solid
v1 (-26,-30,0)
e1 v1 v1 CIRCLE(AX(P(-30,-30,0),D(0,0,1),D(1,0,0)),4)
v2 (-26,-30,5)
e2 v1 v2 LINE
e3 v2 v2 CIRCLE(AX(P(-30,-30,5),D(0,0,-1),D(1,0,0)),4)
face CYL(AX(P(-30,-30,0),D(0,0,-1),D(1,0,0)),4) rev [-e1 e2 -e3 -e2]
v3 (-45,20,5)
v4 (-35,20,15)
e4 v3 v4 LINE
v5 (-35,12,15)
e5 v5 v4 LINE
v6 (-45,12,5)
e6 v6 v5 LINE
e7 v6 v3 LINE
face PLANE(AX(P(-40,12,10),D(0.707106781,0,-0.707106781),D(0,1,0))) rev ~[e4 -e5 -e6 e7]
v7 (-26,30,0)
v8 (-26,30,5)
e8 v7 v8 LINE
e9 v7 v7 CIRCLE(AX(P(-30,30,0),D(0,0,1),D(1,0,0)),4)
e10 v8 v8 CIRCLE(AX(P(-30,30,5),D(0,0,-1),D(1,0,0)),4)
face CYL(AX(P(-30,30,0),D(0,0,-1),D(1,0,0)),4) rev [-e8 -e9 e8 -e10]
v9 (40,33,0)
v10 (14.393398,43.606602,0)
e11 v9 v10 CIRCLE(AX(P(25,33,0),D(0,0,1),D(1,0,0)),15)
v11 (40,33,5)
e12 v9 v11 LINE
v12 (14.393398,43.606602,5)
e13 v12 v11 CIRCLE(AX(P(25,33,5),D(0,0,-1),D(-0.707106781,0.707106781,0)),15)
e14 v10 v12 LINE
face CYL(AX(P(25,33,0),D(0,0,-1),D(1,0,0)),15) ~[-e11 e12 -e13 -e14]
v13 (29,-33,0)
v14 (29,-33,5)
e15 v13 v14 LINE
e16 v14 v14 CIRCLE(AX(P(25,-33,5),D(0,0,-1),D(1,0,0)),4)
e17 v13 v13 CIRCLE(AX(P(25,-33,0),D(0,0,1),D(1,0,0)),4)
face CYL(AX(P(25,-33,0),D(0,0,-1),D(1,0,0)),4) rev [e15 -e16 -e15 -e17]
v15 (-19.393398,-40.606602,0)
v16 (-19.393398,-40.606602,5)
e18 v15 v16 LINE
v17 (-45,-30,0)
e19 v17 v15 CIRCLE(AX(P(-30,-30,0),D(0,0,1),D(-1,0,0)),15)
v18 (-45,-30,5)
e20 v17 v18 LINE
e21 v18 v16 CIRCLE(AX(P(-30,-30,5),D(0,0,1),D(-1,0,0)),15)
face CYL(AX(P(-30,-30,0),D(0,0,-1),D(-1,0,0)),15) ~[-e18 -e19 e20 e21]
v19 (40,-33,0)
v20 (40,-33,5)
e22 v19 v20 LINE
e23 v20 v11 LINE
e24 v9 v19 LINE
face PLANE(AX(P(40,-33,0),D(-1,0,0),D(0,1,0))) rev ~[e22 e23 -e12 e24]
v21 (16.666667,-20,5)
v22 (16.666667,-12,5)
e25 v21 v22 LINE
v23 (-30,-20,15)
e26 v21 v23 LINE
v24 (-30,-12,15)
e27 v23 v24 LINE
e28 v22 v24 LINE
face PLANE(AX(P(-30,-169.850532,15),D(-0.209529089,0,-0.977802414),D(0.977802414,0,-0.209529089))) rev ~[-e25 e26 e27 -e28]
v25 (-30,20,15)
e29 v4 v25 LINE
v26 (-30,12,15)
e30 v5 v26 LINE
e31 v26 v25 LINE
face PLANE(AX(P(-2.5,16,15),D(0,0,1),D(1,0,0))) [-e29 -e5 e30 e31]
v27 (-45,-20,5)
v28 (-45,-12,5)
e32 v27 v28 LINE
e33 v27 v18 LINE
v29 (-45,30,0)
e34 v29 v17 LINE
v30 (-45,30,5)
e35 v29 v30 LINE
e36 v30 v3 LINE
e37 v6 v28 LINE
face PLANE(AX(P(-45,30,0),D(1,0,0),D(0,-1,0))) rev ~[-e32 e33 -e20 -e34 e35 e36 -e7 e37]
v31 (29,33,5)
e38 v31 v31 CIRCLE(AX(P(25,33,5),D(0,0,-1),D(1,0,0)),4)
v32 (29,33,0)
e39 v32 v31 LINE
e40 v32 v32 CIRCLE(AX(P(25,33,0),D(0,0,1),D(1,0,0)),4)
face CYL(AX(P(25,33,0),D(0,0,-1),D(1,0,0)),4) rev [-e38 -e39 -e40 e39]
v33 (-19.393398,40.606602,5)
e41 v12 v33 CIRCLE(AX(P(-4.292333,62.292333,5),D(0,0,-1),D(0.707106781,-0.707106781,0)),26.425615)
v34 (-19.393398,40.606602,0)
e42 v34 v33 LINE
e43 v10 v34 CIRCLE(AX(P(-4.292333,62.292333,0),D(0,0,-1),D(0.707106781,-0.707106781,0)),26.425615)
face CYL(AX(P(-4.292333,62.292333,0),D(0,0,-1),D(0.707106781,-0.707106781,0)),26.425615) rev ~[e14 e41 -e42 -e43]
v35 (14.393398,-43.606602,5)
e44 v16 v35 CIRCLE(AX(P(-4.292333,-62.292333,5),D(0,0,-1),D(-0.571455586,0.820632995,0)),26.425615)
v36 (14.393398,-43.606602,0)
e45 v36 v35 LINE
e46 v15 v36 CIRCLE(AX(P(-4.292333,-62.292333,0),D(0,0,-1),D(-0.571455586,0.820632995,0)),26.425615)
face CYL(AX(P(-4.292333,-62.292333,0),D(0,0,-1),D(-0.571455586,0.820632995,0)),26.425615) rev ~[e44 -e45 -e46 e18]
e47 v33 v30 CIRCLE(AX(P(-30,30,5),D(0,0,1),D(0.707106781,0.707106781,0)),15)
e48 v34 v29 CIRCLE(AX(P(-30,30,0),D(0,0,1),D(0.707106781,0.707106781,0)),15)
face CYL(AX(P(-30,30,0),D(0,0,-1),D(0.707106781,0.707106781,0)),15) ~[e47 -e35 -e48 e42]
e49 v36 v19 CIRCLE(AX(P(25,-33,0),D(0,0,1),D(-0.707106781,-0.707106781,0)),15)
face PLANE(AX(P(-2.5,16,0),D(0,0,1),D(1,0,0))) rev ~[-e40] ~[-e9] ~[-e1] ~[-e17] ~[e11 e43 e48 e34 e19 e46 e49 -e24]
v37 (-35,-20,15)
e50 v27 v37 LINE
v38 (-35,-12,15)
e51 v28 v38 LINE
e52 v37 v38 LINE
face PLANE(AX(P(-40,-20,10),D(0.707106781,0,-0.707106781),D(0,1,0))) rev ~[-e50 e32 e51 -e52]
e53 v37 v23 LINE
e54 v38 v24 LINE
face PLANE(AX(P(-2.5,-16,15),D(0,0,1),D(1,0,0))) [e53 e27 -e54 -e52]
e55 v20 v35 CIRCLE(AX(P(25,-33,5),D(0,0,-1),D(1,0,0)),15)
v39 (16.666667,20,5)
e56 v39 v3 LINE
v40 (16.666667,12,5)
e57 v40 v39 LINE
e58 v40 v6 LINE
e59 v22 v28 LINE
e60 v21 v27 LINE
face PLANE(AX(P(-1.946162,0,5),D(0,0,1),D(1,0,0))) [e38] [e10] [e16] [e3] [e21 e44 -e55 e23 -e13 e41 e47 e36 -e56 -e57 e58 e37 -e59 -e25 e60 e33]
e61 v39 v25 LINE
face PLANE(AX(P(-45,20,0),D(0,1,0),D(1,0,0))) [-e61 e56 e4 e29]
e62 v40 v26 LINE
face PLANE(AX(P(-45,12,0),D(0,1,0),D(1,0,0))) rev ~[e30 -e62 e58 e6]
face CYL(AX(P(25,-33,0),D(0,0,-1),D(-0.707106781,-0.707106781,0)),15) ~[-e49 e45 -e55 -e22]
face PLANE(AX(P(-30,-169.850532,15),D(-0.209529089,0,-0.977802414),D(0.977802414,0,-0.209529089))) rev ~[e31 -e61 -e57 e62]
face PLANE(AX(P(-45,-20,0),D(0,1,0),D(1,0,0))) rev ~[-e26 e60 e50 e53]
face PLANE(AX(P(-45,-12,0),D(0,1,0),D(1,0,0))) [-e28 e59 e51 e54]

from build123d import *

# Parameters (mm, degrees)
F1_DEPTH    = 5
F2_R        = 4
F3_DEPTH    = 25
F5_W        = 85
F5_H        = 8
F6_DEPTH    = 15
F7_T4_DEPTH = 371.701063592
F7_T9_DEPTH = 371.701063592
F8_SIZE     = 10


# Not quite as in the source:
# - a fillet or chamfer that OpenCascade refuses, or shapes differently, is made with other operations: its cross-section is extruded or revolved along the edge and cut away or added
# - a feature names something its author has since deleted; it is built from what else it names


with BuildPart() as f1:
    # F0 (on Top) → F1 (new body)
    with BuildSketch(Plane.XY):
        with BuildLine():
            ThreePointArc((-19.3933982822, 40.6066017178), (-16.1418070123, 35.7402514855), (-15, 30))
            ThreePointArc((-15, 30), (-30, 15), (-45, 30))
            Line((-45, 30), (-45, -30))
            ThreePointArc((-45, -30), (-30, -15), (-15, -30))
            ThreePointArc((-15, -30), (-16.1418070123, -35.7402514855), (-19.3933982822, -40.6066017178))
            ThreePointArc((-19.3933982822, -40.6066017178), (-1.9551429216, -35.9702766297), (14.3933982822, -43.6066017178))
            ThreePointArc((14.3933982822, -43.6066017178), (19.2597485145, -19.1418070123), (40, -33))
            Line((40, -33), (40, 33))
            ThreePointArc((40, 33), (19.2597485145, 19.1418070123), (14.3933982822, 43.6066017178))
            ThreePointArc((14.3933982822, 43.6066017178), (-1.9551429216, 35.9702766297), (-19.3933982822, 40.6066017178))
        make_face()
        with BuildLine():
            ThreePointArc((-15, -30), (-30, -15), (-45, -30))
            ThreePointArc((-45, -30), (-35.7402514855, -43.8581929877), (-19.3933982822, -40.6066017178))
            ThreePointArc((-19.3933982822, -40.6066017178), (-16.1418070123, -35.7402514855), (-15, -30))
        make_face()
        with BuildLine():
            ThreePointArc((-45, 30), (-30, 15), (-15, 30))
            ThreePointArc((-15, 30), (-16.1418070123, 35.7402514855), (-19.3933982822, 40.6066017178))
            ThreePointArc((-19.3933982822, 40.6066017178), (-35.7402514855, 43.8581929877), (-45, 30))
        make_face()
        with BuildLine():
            ThreePointArc((40, 33), (30.7402514855, 46.8581929877), (14.3933982822, 43.6066017178))
            ThreePointArc((14.3933982822, 43.6066017178), (19.2597485145, 19.1418070123), (40, 33))
        make_face()
        with BuildLine():
            ThreePointArc((14.3933982822, -43.6066017178), (30.7402514855, -46.8581929877), (40, -33))
            ThreePointArc((40, -33), (19.2597485145, -19.1418070123), (14.3933982822, -43.6066017178))
        make_face()
    extrude(amount=F1_DEPTH)


with BuildPart() as f3:
    # F2 (on Top) → F3 (new body)
    with BuildSketch(Plane.XY):
        with Locations((-30, 30)):
            Circle(F2_R)
    extrude(amount=F3_DEPTH)


with BuildPart() as f3b:
    # F2 (on Top) → F3, piece 2 (new body)
    with BuildSketch(Plane.XY):
        with Locations((25, 33)):
            Circle(F2_R)
    extrude(amount=F3_DEPTH)


with BuildPart() as f3c:
    # F2 (on Top) → F3, piece 3 (new body)
    with BuildSketch(Plane.XY):
        with Locations((25, -33)):
            Circle(F2_R)
    extrude(amount=F3_DEPTH)


with BuildPart() as f3d:
    # F2 (on Top) → F3, piece 4 (new body)
    with BuildSketch(Plane.XY):
        with Locations((-30, -30)):
            Circle(F2_R)
    extrude(amount=F3_DEPTH)


with BuildPart() as f1_1:
    add(f1.part)

    # F4: cut F3, F3b, F3c, F3d
    add(f3.part, mode=Mode.SUBTRACT)
    add(f3b.part, mode=Mode.SUBTRACT)
    add(f3c.part, mode=Mode.SUBTRACT)
    add(f3d.part, mode=Mode.SUBTRACT)

    # F5 (on Top) → F6 (join)
    with BuildSketch(Plane.XY):
        with Locations((-2.5, 16)):
            Rectangle(F5_W, F5_H)
        with Locations((-2.5, -16)):
            Rectangle(F5_W, F5_H)
    extrude(amount=F6_DEPTH)

    # F7: chamfer of 15 x 70 on 2 edges, made by hand


with BuildPart() as f7_tool2:
    # F7_s3 → F7_t4 (new body)
    with BuildSketch(Plane.XZ.offset(169.850531796)):
        Polygon((-30, 15), (40, 0), (40, 15), align=None)
    extrude(amount=-F7_T4_DEPTH)

    split(bisect_by=Plane.XY.offset(5), keep=Keep.TOP)


with BuildPart() as f1_2:
    add(f1_1.part)

    # F7_t1: cut F7_tool2
    add(f7_tool2.part, mode=Mode.SUBTRACT)


with BuildPart() as f7_tool7:
    # F7_s8 → F7_t9 (new body)
    with BuildSketch(Plane.XZ.offset(201.850531796)):
        Polygon((-30, 15), (40, 0), (40, 15), align=None)
    extrude(amount=-F7_T9_DEPTH)

    split(bisect_by=Plane.XY.offset(5), keep=Keep.TOP)


with BuildPart() as f1_3:
    add(f1_2.part)

    # F7_t6: cut F7_tool7
    add(f7_tool7.part, mode=Mode.SUBTRACT)

    # F8
    f8_edges = [f1_3.edges().sort_by_distance(p)[0] for p in [
        (-45, 16, 15),
        (-45, -16, 15),
    ]]
    chamfer(f8_edges, length=F8_SIZE)


solid = f1_3.part
